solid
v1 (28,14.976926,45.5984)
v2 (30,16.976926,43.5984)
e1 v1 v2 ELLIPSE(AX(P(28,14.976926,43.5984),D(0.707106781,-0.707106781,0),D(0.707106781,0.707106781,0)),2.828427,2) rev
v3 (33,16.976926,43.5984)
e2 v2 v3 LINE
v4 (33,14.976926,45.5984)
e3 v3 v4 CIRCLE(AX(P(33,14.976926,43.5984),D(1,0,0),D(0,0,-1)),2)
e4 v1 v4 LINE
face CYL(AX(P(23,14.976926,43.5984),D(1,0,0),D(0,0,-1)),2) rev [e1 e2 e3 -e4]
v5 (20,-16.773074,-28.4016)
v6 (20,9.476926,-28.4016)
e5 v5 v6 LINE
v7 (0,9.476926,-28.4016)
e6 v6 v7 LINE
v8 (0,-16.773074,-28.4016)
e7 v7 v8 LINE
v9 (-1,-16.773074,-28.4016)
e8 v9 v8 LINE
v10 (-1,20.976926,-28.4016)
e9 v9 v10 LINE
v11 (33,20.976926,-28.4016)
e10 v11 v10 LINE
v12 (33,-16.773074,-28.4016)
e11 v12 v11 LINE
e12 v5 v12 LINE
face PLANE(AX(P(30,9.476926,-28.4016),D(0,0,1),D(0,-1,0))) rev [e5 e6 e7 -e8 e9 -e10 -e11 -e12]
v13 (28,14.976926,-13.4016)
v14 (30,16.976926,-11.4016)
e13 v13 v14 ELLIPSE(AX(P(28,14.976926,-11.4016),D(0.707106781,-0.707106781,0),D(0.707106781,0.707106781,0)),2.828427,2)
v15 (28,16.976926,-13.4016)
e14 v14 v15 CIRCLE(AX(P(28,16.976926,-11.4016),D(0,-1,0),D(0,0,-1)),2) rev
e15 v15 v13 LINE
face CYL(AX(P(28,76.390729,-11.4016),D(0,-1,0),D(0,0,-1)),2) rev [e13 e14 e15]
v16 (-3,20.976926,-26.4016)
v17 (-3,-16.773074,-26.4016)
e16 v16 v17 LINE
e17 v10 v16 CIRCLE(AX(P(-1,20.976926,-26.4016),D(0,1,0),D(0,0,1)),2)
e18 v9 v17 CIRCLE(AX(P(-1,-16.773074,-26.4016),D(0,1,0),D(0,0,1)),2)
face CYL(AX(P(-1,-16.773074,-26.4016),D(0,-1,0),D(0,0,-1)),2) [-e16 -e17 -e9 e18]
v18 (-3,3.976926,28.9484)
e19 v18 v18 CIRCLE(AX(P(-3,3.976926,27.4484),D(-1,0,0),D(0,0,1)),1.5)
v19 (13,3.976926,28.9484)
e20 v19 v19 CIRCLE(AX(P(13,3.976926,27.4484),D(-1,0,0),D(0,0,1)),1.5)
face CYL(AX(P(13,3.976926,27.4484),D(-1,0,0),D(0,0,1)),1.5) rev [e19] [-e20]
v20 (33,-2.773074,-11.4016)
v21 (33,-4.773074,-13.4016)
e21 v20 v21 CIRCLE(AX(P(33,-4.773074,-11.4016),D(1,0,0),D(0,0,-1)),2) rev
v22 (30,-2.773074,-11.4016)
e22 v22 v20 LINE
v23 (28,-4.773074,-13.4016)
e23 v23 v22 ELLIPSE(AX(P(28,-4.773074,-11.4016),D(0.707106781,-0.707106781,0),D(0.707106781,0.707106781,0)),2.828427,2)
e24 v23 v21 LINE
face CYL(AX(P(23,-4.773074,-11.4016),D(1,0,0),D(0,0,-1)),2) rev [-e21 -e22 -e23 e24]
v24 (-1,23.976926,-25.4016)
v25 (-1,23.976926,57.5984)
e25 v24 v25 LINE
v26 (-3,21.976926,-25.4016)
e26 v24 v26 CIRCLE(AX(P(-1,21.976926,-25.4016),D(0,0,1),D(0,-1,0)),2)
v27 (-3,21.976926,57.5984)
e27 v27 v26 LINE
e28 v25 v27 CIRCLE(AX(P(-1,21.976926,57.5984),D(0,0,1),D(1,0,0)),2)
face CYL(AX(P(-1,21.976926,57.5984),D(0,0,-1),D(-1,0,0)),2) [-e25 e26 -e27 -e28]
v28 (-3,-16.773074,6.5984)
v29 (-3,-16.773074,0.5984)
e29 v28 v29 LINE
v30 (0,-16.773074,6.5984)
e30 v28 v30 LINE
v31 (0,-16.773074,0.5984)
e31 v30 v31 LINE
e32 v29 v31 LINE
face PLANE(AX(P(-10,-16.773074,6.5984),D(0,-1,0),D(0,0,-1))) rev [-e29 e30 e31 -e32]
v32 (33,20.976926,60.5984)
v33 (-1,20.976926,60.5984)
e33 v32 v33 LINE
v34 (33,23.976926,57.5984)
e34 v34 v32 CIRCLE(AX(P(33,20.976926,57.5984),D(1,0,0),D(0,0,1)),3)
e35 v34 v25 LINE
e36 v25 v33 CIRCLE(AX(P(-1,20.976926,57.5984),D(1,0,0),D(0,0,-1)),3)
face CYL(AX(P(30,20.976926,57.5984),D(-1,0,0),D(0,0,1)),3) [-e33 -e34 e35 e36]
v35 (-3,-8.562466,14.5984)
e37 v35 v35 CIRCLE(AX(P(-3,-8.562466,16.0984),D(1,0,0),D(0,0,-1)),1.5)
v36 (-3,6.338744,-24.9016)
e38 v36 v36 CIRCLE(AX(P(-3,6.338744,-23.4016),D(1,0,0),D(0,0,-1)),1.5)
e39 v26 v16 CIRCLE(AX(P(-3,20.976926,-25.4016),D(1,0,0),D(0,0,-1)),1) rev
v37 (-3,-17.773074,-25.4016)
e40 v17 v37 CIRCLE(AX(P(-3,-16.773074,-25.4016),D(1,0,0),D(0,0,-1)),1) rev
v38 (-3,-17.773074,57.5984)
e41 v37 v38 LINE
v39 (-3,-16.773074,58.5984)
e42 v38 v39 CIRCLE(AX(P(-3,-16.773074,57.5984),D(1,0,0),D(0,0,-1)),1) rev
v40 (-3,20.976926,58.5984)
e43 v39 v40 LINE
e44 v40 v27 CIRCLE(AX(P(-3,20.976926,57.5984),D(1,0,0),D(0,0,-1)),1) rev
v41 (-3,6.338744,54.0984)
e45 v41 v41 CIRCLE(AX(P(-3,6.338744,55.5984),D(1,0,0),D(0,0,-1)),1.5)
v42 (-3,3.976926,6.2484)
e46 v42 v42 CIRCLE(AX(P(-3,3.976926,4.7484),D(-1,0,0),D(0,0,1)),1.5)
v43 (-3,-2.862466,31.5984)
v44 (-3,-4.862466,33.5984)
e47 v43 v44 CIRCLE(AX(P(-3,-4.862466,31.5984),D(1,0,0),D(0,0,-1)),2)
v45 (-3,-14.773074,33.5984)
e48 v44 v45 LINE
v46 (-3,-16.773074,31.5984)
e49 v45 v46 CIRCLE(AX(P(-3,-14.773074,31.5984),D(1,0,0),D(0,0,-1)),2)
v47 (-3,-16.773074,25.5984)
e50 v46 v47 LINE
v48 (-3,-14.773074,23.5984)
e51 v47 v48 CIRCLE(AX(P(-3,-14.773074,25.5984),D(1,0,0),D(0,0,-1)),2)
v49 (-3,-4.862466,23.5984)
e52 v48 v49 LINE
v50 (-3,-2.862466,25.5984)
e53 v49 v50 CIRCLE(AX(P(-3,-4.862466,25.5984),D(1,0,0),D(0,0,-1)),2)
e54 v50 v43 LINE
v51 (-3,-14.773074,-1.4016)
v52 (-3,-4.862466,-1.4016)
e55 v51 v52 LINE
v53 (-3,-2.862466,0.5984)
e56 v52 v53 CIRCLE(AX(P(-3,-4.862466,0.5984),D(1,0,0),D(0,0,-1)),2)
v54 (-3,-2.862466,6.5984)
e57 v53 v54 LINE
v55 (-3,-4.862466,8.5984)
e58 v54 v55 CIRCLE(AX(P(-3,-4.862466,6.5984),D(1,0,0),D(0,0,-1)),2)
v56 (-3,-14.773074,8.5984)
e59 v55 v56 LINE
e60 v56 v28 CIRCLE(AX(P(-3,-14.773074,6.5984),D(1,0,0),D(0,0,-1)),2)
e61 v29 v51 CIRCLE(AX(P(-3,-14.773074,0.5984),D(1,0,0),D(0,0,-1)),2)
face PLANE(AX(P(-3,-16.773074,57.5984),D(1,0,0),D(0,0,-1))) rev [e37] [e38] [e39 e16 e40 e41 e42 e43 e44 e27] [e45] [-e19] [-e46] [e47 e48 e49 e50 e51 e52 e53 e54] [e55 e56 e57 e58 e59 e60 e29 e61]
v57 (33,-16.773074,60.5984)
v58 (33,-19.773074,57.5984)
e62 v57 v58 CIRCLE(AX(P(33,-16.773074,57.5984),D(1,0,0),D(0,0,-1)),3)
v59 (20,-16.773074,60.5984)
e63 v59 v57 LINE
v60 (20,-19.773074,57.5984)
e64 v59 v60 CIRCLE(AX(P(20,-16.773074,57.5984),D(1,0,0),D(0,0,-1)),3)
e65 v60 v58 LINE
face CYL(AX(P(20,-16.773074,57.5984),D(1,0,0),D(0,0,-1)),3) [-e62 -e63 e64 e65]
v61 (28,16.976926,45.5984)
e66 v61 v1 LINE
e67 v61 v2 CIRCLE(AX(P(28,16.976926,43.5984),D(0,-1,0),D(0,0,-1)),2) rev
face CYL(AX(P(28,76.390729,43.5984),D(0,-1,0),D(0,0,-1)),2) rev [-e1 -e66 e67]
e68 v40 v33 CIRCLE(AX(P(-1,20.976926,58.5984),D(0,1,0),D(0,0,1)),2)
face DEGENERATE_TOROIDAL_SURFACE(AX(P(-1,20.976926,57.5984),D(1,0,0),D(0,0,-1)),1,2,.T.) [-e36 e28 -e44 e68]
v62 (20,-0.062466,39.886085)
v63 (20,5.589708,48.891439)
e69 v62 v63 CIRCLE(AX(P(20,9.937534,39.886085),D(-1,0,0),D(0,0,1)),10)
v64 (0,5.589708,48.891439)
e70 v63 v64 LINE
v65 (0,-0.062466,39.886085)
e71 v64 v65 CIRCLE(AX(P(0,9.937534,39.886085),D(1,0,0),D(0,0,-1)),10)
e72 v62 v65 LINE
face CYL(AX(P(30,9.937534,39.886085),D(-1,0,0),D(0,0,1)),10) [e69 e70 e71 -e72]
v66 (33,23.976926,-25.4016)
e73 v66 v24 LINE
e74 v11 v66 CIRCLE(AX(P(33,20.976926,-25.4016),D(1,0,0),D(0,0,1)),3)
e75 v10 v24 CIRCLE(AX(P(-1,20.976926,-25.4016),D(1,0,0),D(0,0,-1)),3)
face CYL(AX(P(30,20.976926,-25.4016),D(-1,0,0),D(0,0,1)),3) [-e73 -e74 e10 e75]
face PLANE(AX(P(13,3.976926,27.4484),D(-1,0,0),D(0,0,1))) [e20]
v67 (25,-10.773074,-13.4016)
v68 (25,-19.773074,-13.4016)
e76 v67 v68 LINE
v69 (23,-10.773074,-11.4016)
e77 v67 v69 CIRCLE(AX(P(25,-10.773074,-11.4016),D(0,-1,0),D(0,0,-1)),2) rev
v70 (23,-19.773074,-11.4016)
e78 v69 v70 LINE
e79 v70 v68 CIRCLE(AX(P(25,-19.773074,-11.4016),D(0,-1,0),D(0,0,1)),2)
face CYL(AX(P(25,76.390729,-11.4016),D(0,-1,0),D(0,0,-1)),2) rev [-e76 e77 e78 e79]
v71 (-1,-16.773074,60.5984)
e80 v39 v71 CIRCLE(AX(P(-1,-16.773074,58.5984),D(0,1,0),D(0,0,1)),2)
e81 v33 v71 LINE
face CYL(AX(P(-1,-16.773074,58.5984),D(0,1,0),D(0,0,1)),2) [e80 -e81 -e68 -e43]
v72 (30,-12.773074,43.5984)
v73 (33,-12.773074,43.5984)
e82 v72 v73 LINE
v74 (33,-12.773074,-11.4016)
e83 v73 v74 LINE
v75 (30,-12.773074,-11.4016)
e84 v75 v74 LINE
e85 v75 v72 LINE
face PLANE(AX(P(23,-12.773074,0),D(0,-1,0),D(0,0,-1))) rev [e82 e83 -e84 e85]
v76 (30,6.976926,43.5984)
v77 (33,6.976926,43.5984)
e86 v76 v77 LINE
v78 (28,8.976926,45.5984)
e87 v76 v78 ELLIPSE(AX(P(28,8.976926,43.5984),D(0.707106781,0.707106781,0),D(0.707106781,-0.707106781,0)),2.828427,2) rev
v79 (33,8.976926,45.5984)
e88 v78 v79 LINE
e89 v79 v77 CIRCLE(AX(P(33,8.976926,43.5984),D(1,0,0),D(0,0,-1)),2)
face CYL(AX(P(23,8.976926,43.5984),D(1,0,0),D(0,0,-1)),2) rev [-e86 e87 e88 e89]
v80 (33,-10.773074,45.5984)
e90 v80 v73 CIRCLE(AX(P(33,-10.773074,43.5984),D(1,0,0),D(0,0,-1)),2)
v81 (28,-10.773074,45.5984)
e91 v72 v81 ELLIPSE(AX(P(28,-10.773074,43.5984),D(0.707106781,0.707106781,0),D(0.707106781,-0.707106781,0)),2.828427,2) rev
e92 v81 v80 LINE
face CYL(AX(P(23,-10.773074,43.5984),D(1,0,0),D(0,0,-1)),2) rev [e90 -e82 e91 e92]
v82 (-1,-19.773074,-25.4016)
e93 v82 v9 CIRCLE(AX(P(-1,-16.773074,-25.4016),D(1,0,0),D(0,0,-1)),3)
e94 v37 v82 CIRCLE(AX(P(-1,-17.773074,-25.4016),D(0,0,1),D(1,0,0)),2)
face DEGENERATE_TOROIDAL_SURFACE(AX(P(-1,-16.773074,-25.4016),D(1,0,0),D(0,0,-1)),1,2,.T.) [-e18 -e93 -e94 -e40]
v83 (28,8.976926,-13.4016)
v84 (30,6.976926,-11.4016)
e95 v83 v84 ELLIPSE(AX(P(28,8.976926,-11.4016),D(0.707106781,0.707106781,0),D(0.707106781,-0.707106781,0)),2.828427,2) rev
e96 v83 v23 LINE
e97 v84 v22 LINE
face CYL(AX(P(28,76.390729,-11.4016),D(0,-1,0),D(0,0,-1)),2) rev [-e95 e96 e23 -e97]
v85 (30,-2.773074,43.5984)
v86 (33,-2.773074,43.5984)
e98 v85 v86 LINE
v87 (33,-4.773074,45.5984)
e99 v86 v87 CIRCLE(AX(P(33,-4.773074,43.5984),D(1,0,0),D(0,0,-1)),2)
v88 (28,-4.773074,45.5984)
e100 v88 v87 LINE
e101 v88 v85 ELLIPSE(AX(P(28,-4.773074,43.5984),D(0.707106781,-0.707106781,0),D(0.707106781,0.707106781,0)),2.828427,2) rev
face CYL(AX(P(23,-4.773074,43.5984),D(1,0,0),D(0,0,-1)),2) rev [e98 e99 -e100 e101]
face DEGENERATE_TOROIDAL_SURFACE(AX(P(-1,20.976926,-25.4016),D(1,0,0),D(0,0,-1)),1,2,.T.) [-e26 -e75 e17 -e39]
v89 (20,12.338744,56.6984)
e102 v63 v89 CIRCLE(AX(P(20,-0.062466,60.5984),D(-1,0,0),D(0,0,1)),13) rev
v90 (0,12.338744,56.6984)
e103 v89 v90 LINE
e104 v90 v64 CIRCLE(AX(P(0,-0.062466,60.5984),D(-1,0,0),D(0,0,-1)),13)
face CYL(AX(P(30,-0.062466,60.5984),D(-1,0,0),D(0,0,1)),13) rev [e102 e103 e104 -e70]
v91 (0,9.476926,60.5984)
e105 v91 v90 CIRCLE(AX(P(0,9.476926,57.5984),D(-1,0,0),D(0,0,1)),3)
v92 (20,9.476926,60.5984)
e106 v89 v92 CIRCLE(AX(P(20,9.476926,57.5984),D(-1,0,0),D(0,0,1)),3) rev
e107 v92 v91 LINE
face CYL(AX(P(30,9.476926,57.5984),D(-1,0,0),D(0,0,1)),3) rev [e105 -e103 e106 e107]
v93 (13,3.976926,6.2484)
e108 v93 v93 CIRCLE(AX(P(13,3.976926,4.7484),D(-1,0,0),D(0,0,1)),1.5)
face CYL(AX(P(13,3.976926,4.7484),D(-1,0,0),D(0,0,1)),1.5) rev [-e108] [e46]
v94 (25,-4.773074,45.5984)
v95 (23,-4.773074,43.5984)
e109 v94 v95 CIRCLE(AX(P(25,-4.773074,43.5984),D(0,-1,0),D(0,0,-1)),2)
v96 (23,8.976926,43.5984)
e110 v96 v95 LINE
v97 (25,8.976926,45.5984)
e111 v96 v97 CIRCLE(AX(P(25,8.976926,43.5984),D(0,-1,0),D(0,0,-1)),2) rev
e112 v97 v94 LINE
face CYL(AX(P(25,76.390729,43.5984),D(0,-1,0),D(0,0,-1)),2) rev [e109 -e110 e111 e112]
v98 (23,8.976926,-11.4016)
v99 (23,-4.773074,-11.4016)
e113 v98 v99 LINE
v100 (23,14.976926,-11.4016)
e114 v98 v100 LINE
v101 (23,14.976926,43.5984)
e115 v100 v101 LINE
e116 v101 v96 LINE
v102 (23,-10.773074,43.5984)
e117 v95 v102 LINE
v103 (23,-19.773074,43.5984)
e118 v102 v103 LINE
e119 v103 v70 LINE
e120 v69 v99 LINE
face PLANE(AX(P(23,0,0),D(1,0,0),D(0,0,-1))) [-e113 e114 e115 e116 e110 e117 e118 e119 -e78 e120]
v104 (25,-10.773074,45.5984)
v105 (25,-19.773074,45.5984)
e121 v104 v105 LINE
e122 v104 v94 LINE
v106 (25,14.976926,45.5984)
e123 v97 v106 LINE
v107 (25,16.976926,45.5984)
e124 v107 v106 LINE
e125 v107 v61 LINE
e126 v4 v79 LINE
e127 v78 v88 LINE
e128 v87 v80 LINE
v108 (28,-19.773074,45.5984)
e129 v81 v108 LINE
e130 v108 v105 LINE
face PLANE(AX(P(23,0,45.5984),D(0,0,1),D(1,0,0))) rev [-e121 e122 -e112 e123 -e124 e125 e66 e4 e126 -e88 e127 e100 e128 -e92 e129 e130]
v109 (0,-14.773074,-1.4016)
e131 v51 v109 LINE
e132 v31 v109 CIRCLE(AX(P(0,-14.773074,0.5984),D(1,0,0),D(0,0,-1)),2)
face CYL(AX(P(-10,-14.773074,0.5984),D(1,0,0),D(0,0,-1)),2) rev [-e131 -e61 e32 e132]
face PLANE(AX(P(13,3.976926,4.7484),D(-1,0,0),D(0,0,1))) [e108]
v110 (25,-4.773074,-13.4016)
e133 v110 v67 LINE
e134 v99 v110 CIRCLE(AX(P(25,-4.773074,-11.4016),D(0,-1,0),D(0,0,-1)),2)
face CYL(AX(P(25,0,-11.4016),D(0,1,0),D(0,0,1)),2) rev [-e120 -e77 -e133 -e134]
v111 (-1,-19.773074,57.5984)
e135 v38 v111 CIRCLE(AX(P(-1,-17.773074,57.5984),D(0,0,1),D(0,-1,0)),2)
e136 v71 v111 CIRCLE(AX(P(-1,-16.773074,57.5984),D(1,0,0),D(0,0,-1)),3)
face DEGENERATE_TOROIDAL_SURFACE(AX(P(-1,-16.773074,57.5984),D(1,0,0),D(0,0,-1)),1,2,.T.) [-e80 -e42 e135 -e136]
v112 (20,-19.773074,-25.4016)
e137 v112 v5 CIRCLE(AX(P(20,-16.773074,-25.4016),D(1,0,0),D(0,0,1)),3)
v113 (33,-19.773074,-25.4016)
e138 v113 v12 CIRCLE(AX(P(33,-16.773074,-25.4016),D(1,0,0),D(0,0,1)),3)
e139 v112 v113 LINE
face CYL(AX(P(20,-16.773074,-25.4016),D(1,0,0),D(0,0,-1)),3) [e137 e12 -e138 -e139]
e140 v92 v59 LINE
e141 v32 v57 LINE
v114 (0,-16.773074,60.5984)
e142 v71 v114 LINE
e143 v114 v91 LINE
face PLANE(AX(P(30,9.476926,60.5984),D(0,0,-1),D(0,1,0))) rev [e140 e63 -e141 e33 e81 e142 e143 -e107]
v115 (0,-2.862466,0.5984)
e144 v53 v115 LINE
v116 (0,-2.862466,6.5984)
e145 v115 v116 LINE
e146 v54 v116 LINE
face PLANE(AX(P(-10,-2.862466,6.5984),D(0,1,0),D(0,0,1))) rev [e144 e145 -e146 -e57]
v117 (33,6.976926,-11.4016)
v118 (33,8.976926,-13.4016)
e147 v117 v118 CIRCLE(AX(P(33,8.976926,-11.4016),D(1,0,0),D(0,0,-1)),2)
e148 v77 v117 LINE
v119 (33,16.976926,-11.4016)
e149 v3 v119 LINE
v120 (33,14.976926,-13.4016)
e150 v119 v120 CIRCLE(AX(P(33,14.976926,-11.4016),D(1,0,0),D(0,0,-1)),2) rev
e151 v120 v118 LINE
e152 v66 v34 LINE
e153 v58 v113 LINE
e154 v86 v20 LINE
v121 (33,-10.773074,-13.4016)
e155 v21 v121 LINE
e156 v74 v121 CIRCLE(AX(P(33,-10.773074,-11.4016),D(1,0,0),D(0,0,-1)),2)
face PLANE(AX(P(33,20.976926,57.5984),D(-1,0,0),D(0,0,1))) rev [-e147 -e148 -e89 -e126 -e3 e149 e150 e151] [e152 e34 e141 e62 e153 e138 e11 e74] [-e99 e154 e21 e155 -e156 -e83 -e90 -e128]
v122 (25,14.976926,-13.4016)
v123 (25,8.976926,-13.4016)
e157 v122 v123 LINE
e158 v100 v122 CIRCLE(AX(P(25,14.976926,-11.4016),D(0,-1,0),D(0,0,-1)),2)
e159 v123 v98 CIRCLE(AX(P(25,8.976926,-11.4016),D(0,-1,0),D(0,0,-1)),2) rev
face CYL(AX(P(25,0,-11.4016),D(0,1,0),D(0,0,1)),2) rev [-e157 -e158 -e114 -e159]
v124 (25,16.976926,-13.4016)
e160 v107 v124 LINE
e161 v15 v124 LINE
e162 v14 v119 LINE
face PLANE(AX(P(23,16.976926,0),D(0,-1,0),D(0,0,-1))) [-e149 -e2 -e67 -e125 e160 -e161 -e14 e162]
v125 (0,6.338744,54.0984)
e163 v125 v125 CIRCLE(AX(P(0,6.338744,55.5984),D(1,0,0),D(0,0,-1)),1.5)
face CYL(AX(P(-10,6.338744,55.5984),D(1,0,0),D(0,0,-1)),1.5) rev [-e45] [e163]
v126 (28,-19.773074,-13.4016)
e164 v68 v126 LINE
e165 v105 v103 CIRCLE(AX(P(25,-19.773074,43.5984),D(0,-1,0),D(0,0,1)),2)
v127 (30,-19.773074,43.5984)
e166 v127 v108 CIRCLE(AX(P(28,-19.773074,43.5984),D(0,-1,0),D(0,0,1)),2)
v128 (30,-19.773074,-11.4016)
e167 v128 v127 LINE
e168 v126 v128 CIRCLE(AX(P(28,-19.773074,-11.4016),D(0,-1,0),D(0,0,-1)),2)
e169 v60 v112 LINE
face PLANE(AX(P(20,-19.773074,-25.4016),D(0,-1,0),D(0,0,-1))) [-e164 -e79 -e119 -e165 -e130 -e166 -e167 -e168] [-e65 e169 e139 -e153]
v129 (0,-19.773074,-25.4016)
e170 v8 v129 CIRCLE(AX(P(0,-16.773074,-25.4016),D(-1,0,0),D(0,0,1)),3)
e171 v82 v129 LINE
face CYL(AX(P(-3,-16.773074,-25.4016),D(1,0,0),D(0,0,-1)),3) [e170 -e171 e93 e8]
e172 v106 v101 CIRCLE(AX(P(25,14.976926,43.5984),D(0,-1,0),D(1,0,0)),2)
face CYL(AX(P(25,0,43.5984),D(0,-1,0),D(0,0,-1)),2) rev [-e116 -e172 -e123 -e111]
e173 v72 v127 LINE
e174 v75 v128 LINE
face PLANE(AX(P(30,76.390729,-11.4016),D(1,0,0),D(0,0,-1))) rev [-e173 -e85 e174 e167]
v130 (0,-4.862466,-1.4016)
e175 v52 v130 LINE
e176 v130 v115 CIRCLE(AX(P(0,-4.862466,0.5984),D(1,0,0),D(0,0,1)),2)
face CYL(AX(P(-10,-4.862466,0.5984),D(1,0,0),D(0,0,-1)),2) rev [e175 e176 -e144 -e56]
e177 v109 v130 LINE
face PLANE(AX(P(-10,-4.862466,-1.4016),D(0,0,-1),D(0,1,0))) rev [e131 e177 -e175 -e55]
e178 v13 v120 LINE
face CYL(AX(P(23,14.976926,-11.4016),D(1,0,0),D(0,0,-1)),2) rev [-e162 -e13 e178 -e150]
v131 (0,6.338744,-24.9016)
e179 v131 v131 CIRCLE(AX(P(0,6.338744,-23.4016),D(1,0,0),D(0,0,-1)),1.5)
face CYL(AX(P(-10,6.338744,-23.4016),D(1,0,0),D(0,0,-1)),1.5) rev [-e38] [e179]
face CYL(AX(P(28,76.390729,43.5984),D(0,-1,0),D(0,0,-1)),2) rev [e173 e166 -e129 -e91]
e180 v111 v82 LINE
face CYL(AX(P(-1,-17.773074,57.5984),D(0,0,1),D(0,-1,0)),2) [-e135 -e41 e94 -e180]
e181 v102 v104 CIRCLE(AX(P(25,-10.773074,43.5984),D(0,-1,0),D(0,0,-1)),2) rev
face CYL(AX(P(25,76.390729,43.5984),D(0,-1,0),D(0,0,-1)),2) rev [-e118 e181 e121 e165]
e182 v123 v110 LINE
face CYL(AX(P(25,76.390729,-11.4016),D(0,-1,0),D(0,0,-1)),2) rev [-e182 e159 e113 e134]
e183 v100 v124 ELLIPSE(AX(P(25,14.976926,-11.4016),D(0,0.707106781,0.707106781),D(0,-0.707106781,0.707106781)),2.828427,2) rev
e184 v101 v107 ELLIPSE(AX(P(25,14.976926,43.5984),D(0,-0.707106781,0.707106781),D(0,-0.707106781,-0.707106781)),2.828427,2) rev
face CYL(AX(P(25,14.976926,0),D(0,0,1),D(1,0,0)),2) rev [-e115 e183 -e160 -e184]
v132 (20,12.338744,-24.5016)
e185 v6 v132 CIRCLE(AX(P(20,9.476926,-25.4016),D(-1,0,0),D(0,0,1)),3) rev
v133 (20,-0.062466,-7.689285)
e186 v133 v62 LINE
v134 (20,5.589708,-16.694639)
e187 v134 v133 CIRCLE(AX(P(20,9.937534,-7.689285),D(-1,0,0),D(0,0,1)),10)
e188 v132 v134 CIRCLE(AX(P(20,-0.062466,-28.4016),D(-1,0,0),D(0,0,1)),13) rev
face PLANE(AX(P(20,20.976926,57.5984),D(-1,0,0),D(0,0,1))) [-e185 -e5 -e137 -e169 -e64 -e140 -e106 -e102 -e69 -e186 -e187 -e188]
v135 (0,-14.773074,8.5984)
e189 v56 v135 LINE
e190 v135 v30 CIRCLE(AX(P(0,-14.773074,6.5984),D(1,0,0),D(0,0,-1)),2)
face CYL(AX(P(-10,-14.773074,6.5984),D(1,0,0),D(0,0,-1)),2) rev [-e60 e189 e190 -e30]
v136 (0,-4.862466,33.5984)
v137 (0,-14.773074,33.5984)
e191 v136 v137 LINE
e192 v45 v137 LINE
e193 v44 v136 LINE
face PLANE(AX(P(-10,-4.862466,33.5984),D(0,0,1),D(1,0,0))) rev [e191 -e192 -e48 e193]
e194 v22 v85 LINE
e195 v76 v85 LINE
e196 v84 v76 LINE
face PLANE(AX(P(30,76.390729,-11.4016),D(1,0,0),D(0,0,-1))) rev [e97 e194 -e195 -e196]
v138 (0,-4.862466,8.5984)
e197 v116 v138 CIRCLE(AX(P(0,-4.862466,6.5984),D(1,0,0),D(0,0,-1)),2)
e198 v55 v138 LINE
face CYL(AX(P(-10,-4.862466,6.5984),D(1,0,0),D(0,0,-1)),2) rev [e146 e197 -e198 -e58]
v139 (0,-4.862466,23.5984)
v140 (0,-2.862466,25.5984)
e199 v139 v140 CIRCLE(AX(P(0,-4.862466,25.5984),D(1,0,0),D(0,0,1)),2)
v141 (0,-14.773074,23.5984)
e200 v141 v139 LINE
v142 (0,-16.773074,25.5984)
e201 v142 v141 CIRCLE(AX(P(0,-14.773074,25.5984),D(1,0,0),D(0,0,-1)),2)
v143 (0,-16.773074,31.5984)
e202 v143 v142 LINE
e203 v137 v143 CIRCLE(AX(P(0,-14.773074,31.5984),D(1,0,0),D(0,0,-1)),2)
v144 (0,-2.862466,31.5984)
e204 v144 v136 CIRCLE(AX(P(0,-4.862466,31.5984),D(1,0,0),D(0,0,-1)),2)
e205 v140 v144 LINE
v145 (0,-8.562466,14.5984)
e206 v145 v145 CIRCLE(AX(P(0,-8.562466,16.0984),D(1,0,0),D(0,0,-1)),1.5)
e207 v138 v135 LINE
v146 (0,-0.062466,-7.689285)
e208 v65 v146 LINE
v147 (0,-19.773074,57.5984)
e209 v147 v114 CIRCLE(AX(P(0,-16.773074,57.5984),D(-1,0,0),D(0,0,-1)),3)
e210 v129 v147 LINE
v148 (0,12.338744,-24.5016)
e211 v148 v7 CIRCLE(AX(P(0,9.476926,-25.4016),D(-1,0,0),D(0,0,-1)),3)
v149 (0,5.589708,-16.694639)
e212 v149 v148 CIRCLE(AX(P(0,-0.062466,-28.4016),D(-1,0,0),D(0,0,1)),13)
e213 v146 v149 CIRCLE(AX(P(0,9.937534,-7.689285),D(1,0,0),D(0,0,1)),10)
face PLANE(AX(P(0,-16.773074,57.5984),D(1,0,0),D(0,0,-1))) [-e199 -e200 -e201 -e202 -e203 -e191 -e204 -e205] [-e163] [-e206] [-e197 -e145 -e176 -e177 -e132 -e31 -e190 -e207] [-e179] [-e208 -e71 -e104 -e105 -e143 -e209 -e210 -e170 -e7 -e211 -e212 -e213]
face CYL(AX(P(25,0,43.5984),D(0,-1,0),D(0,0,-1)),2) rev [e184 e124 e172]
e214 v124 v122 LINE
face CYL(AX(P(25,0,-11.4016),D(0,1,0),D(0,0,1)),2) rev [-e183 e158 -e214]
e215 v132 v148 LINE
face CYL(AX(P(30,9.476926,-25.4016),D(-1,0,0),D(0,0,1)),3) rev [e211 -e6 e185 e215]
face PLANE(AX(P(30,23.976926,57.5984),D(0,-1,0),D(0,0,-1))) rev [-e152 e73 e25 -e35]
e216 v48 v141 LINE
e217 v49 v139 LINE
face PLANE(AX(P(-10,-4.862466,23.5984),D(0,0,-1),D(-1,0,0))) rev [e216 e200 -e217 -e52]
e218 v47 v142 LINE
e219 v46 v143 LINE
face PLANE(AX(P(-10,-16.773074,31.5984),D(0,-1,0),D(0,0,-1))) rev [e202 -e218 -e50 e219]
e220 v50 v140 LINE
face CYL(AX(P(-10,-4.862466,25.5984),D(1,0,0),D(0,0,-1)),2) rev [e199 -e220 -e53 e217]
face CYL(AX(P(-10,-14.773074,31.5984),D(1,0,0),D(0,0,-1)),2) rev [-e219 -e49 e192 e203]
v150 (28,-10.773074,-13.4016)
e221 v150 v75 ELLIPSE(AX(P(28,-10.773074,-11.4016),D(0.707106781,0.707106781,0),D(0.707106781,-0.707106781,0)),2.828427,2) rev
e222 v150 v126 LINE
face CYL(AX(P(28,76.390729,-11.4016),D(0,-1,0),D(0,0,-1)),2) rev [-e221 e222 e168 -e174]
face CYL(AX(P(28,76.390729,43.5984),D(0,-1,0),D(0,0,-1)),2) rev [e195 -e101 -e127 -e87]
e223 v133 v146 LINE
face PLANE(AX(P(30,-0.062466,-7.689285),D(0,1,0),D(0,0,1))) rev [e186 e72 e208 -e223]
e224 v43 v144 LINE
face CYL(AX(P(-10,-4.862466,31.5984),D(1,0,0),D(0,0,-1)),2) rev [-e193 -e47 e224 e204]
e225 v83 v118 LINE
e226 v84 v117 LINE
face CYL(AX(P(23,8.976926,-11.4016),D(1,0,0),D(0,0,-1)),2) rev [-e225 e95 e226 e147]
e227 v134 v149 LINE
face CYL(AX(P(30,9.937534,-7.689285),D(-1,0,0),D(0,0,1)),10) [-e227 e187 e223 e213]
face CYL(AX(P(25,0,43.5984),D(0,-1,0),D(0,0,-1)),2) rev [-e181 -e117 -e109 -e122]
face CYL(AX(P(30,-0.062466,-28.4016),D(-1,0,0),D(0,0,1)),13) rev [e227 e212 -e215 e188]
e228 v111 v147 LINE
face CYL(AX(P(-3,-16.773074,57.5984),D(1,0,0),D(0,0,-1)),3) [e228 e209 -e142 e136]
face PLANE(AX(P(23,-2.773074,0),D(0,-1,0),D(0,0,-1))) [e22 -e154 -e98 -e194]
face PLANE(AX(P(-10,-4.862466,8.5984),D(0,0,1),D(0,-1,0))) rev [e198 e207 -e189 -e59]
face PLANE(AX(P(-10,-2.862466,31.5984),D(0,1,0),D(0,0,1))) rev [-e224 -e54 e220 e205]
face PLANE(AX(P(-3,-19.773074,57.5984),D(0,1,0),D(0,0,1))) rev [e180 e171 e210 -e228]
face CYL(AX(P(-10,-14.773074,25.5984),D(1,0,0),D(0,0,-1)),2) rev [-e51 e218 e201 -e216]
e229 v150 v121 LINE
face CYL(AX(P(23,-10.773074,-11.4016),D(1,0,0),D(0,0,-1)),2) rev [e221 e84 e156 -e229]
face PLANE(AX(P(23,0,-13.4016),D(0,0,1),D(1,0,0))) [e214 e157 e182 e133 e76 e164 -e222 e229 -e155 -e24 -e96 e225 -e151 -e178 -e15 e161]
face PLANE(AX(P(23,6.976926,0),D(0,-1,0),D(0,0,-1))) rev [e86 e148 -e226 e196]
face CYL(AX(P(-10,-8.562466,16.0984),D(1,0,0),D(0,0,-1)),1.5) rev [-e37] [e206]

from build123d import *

# Parameters (mm, degrees)
RESSALTO_EXTRUS_O2_DEPTH      = 30
RESSALTO_EXTRUS_O3_START      = 3
RESSALTO_EXTRUS_O3_DEPTH      = 3
RESSALTO_EXTRUS_O4_DEPTH      = 3
RESSALTO_EXTRUS_O4_DEPTH_BACK = 10
CORTE_EXTRUS_O1_DEPTH         = 10
CORTE_EXTRUS_O2_REACH         = 83.702
FILETE1_START                 = -19.773073923
FILETE1_DEPTH                 = 36.75
FILETE1_START_2               = -13.40159992
FILETE1_2_DEPTH               = 59
ESBO_O10_R                    = 1.5
CORTE_EXTRUS_O3_DEPTH         = 10
CORTE_EXTRUS_O4_DEPTH         = 10
FILETE2_R                     = 2
ESBO_O13_R                    = 1.5
CORTE_EXTRUS_O5_DEPTH         = 16


with BuildPart() as part:
    # Esboço2 → Ressalto-extrusão2 (new body)
    with BuildSketch(Plane(origin=(0, 0, 0), x_dir=(0, 0, -1), z_dir=(1, 0, 0))):
        with BuildLine():
            Line((2.90159992, -0.062465938), (-35.09840008, -0.062465938))
            Line((-35.09840008, -0.062465938), (-39.886084903, -0.062465938))
            ThreePointArc((-39.886084903, -0.062465938), (-45.202180234, 1.467638524), (-48.891439328, 5.589707975))
            ThreePointArc((-48.891439328, 5.589707975), (-52.096536948, 9.772081499), (-56.69840008, 12.338743681))
            ThreePointArc((-56.69840008, 12.338743681), (-59.373224015, 11.895603401), (-60.59840008, 9.476926077))
            Line((-60.59840008, 9.476926077), (-60.59840008, 20.976926077))
            ThreePointArc((-60.59840008, 20.976926077), (-59.719720424, 23.09824642), (-57.59840008, 23.976926077))
            Line((-57.59840008, 23.976926077), (25.40159992, 23.976926077))
            ThreePointArc((25.40159992, 23.976926077), (27.522920263, 23.09824642), (28.40159992, 20.976926077))
            Line((28.40159992, 20.976926077), (28.40159992, 9.476926077))
            ThreePointArc((28.40159992, 9.476926077), (27.176423855, 11.895603401), (24.50159992, 12.338743681))
            ThreePointArc((24.50159992, 12.338743681), (19.899736788, 9.772081499), (16.694639168, 5.589707975))
            ThreePointArc((16.694639168, 5.589707975), (13.005380073, 1.467638524), (7.689284743, -0.062465938))
            Line((7.689284743, -0.062465938), (2.90159992, -0.062465938))
        make_face()
    extrude(amount=RESSALTO_EXTRUS_O2_DEPTH)

    # Esboço3 → Ressalto-extrusão3 (add)
    with BuildSketch(Plane.ZY.offset(RESSALTO_EXTRUS_O3_START)):
        with BuildLine():
            Line((60.59840008, 15.226926077), (60.59840008, 20.976926077))
            ThreePointArc((60.59840008, 20.976926077), (59.719720424, 23.09824642), (57.59840008, 23.976926077))
            Line((57.59840008, 23.976926077), (16.09840008, 23.976926077))
            Line((16.09840008, 23.976926077), (-25.40159992, 23.976926077))
            ThreePointArc((-25.40159992, 23.976926077), (-27.522920263, 23.09824642), (-28.40159992, 20.976926077))
            Line((-28.40159992, 20.976926077), (-28.40159992, 15.226926077))
            Line((-28.40159992, 15.226926077), (-28.40159992, -16.773073923))
            ThreePointArc((-28.40159992, -16.773073923), (-27.522920263, -18.894394267), (-25.40159992, -19.773073923))
            Line((-25.40159992, -19.773073923), (57.59840008, -19.773073923))
            ThreePointArc((57.59840008, -19.773073923), (59.719720424, -18.894394267), (60.59840008, -16.773073923))
            Line((60.59840008, -16.773073923), (60.59840008, 15.226926077))
        make_face()
    extrude(amount=-RESSALTO_EXTRUS_O3_DEPTH)

    # Esboço4 → Ressalto-extrusão4 (add, two sides: drawn at the far end of the back side and taken through both)
    with BuildSketch(Plane(origin=(30, 0, 0), x_dir=(0, 0, -1), z_dir=(1, 0, 0)).offset(-RESSALTO_EXTRUS_O4_DEPTH_BACK)):
        with BuildLine():
            Line((-16.09840008, 23.976926077), (25.40159992, 23.976926077))
            ThreePointArc((25.40159992, 23.976926077), (27.522920263, 23.09824642), (28.40159992, 20.976926077))
            Line((28.40159992, 20.976926077), (28.40159992, 15.226926077))
            Line((28.40159992, 15.226926077), (28.40159992, -16.773073923))
            ThreePointArc((28.40159992, -16.773073923), (27.522920263, -18.894394267), (25.40159992, -19.773073923))
            Line((25.40159992, -19.773073923), (-57.59840008, -19.773073923))
            ThreePointArc((-57.59840008, -19.773073923), (-59.719720424, -18.894394267), (-60.59840008, -16.773073923))
            Line((-60.59840008, -16.773073923), (-60.59840008, 15.226926077))
            Line((-60.59840008, 15.226926077), (-60.59840008, 20.976926077))
            ThreePointArc((-60.59840008, 20.976926077), (-59.719720424, 23.09824642), (-57.59840008, 23.976926077))
            Line((-57.59840008, 23.976926077), (-16.09840008, 23.976926077))
        make_face()
    extrude(amount=RESSALTO_EXTRUS_O4_DEPTH + RESSALTO_EXTRUS_O4_DEPTH_BACK)

    # Esboço8 → Corte-extrusão1 (cut)
    with BuildSketch(Plane(origin=(33, 0, 0), x_dir=(0, 0, -1), z_dir=(1, 0, 0))):
        with BuildLine():
            Line((-43.59840008, -2.773073923), (11.40159992, -2.773073923))
            ThreePointArc((11.40159992, -2.773073923), (12.815813482, -3.358860361), (13.40159992, -4.773073923))
            Line((13.40159992, -4.773073923), (13.40159992, -10.773073923))
            ThreePointArc((13.40159992, -10.773073923), (12.815813482, -12.187287486), (11.40159992, -12.773073923))
            Line((11.40159992, -12.773073923), (-43.59840008, -12.773073923))
            ThreePointArc((-43.59840008, -12.773073923), (-45.012613643, -12.187287486), (-45.59840008, -10.773073923))
            Line((-45.59840008, -10.773073923), (-45.59840008, -4.773073923))
            ThreePointArc((-45.59840008, -4.773073923), (-45.012613643, -3.358860361), (-43.59840008, -2.773073923))
        make_face()
        with BuildLine():
            Line((-43.59840008, 6.976926077), (11.40159992, 6.976926077))
            ThreePointArc((11.40159992, 6.976926077), (12.815813482, 7.562712514), (13.40159992, 8.976926077))
            Line((13.40159992, 8.976926077), (13.40159992, 14.976926077))
            ThreePointArc((13.40159992, 14.976926077), (12.815813482, 16.391139639), (11.40159992, 16.976926077))
            Line((11.40159992, 16.976926077), (-43.59840008, 16.976926077))
            ThreePointArc((-43.59840008, 16.976926077), (-45.012613643, 16.391139639), (-45.59840008, 14.976926077))
            Line((-45.59840008, 14.976926077), (-45.59840008, 8.976926077))
            ThreePointArc((-45.59840008, 8.976926077), (-45.012613643, 7.562712514), (-43.59840008, 6.976926077))
        make_face()
    extrude(amount=-CORTE_EXTRUS_O1_DEPTH, mode=Mode.SUBTRACT)

    # Corte-extrusão2: up to this face of the body (flat: up to its plane)
    corte_extrus_o2_end = Plane(part.part.faces().sort_by_distance((28, 16.976926077, 16.09840008))[0])
    # Esboço9 → Corte-extrusão2 (cut, up to the picked face)
    with BuildSketch(Plane(origin=(0, -19.773073923, 0), x_dir=(-1, 0, 0), z_dir=(0, -1, 0)), mode=Mode.PRIVATE) as corte_extrus_o2_sk1:
        with BuildLine():
            Line((-25, 13.40159992), (-28, 13.40159992))
            ThreePointArc((-28, 13.40159992), (-29.414213562, 12.815813482), (-30, 11.40159992))
            Line((-30, 11.40159992), (-30, -43.59840008))
            ThreePointArc((-30, -43.59840008), (-29.414213562, -45.012613643), (-28, -45.59840008))
            Line((-28, -45.59840008), (-25, -45.59840008))
            ThreePointArc((-25, -45.59840008), (-23.585786438, -45.012613643), (-23, -43.59840008))
            Line((-23, -43.59840008), (-23, 11.40159992))
            ThreePointArc((-23, 11.40159992), (-23.585786438, 12.815813482), (-25, 13.40159992))
        make_face()
    corte_extrus_o2_tool1 = split(extrude(corte_extrus_o2_sk1.sketch, amount=-CORTE_EXTRUS_O2_REACH, mode=Mode.PRIVATE), bisect_by=corte_extrus_o2_end, keep=Keep.BOTH, mode=Mode.PRIVATE)
    add(corte_extrus_o2_tool1.solids().sort_by(Axis((26.5, -19.773074, 16.0984), (0, 1, 0)))[0], mode=Mode.SUBTRACT)

    # Filete1: read off the stored shape, not the designer's step
    # Filete1 outline → Filete1 (add)
    with BuildSketch(Plane(origin=(0, 0, 0), x_dir=(1, 0, 0), z_dir=(0, 1, 0)).offset(FILETE1_START)):
        with BuildLine():
            ThreePointArc((25, -45.59840008), (23.585786437, -45.012613642), (23, -43.59840008))
            Line((23, -43.59840008), (23, -45.59840008))
            Line((23, -45.59840008), (25, -45.59840008))
        make_face()
        with BuildLine():
            ThreePointArc((23, 11.40159992), (23.585786438, 12.815813482), (25, 13.40159992))
            Line((25, 13.40159992), (23, 13.40159992))
            Line((23, 13.40159992), (23, 11.40159992))
        make_face()
    extrude(amount=FILETE1_DEPTH)

    # Filete1 2 outline → Filete1 2 (add)
    with BuildSketch(Plane.XY.offset(FILETE1_START_2)):
        with BuildLine():
            ThreePointArc((23, 14.976926077), (23.585786438, 16.391139639), (25, 16.976926077))
            Line((25, 16.976926077), (23, 16.976926077))
            Line((23, 16.976926077), (23, 14.976926077))
        make_face()
    extrude(amount=FILETE1_2_DEPTH)

    # Esboço10 → Corte-extrusão3 (cut)
    with BuildSketch(Plane(origin=(0, 0, 0), x_dir=(0, 0, -1), z_dir=(1, 0, 0))):
        with Locations((-55.59840008, 6.338743681)):
            Circle(ESBO_O10_R)
        with Locations((23.40159992, 6.338743681)):
            Circle(ESBO_O10_R)
        with Locations((-16.09840008, -8.562465938)):
            Circle(ESBO_O10_R)
    extrude(amount=-CORTE_EXTRUS_O3_DEPTH, mode=Mode.SUBTRACT)

    # Esboço12 → Corte-extrusão4 (cut)
    with BuildSketch(Plane(origin=(0, 0, 0), x_dir=(0, 0, -1), z_dir=(1, 0, 0))):
        with BuildLine():
            Line((-31.59840008, -2.862465938), (-25.59840008, -2.862465938))
            ThreePointArc((-25.59840008, -2.862465938), (-24.184186518, -3.448252375), (-23.59840008, -4.862465938))
            Line((-23.59840008, -4.862465938), (-23.59840008, -14.773073923))
            ThreePointArc((-23.59840008, -14.773073923), (-24.184186518, -16.187287486), (-25.59840008, -16.773073923))
            Line((-25.59840008, -16.773073923), (-31.59840008, -16.773073923))
            ThreePointArc((-31.59840008, -16.773073923), (-33.012613643, -16.187287486), (-33.59840008, -14.773073923))
            Line((-33.59840008, -14.773073923), (-33.59840008, -4.862465938))
            ThreePointArc((-33.59840008, -4.862465938), (-33.012613643, -3.448252375), (-31.59840008, -2.862465938))
        make_face()
        with BuildLine():
            Line((-6.59840008, -2.862465938), (-0.59840008, -2.862465938))
            ThreePointArc((-0.59840008, -2.862465938), (0.815813482, -3.448252375), (1.40159992, -4.862465938))
            Line((1.40159992, -4.862465938), (1.40159992, -14.773073923))
            ThreePointArc((1.40159992, -14.773073923), (0.815813482, -16.187287486), (-0.59840008, -16.773073923))
            Line((-0.59840008, -16.773073923), (-6.59840008, -16.773073923))
            ThreePointArc((-6.59840008, -16.773073923), (-8.012613643, -16.187287486), (-8.59840008, -14.773073923))
            Line((-8.59840008, -14.773073923), (-8.59840008, -4.862465938))
            ThreePointArc((-8.59840008, -4.862465938), (-8.012613643, -3.448252375), (-6.59840008, -2.862465938))
        make_face()
    extrude(amount=-CORTE_EXTRUS_O4_DEPTH, mode=Mode.SUBTRACT)

    # Filete2
    filete2_edges = [part.edges().sort_by_distance(p)[0] for p in [
        (-3, 2.101926077, 60.59840008),
        (-3, 23.09824642, 59.719720424),
        (-3, 23.976926077, 16.09840008),
        (-3, 23.09824642, -27.522920263),
        (-3, 2.101926077, -28.40159992),
        (-3, -18.894394267, -27.522920263),
        (-3, -19.773073923, 16.09840008),
        (-3, -18.894394267, 59.719720424),
    ]]
    fillet(filete2_edges, radius=FILETE2_R)

    # Esboço13 → Corte-extrusão5 (cut)
    with BuildSketch(Plane.ZY.offset(3)):
        with Locations((27.44840008, 3.976926077)):
            Circle(ESBO_O13_R)
        with Locations((4.74840008, 3.976926077)):
            Circle(ESBO_O13_R)
    extrude(amount=-CORTE_EXTRUS_O5_DEPTH, mode=Mode.SUBTRACT)


solid = part.part
